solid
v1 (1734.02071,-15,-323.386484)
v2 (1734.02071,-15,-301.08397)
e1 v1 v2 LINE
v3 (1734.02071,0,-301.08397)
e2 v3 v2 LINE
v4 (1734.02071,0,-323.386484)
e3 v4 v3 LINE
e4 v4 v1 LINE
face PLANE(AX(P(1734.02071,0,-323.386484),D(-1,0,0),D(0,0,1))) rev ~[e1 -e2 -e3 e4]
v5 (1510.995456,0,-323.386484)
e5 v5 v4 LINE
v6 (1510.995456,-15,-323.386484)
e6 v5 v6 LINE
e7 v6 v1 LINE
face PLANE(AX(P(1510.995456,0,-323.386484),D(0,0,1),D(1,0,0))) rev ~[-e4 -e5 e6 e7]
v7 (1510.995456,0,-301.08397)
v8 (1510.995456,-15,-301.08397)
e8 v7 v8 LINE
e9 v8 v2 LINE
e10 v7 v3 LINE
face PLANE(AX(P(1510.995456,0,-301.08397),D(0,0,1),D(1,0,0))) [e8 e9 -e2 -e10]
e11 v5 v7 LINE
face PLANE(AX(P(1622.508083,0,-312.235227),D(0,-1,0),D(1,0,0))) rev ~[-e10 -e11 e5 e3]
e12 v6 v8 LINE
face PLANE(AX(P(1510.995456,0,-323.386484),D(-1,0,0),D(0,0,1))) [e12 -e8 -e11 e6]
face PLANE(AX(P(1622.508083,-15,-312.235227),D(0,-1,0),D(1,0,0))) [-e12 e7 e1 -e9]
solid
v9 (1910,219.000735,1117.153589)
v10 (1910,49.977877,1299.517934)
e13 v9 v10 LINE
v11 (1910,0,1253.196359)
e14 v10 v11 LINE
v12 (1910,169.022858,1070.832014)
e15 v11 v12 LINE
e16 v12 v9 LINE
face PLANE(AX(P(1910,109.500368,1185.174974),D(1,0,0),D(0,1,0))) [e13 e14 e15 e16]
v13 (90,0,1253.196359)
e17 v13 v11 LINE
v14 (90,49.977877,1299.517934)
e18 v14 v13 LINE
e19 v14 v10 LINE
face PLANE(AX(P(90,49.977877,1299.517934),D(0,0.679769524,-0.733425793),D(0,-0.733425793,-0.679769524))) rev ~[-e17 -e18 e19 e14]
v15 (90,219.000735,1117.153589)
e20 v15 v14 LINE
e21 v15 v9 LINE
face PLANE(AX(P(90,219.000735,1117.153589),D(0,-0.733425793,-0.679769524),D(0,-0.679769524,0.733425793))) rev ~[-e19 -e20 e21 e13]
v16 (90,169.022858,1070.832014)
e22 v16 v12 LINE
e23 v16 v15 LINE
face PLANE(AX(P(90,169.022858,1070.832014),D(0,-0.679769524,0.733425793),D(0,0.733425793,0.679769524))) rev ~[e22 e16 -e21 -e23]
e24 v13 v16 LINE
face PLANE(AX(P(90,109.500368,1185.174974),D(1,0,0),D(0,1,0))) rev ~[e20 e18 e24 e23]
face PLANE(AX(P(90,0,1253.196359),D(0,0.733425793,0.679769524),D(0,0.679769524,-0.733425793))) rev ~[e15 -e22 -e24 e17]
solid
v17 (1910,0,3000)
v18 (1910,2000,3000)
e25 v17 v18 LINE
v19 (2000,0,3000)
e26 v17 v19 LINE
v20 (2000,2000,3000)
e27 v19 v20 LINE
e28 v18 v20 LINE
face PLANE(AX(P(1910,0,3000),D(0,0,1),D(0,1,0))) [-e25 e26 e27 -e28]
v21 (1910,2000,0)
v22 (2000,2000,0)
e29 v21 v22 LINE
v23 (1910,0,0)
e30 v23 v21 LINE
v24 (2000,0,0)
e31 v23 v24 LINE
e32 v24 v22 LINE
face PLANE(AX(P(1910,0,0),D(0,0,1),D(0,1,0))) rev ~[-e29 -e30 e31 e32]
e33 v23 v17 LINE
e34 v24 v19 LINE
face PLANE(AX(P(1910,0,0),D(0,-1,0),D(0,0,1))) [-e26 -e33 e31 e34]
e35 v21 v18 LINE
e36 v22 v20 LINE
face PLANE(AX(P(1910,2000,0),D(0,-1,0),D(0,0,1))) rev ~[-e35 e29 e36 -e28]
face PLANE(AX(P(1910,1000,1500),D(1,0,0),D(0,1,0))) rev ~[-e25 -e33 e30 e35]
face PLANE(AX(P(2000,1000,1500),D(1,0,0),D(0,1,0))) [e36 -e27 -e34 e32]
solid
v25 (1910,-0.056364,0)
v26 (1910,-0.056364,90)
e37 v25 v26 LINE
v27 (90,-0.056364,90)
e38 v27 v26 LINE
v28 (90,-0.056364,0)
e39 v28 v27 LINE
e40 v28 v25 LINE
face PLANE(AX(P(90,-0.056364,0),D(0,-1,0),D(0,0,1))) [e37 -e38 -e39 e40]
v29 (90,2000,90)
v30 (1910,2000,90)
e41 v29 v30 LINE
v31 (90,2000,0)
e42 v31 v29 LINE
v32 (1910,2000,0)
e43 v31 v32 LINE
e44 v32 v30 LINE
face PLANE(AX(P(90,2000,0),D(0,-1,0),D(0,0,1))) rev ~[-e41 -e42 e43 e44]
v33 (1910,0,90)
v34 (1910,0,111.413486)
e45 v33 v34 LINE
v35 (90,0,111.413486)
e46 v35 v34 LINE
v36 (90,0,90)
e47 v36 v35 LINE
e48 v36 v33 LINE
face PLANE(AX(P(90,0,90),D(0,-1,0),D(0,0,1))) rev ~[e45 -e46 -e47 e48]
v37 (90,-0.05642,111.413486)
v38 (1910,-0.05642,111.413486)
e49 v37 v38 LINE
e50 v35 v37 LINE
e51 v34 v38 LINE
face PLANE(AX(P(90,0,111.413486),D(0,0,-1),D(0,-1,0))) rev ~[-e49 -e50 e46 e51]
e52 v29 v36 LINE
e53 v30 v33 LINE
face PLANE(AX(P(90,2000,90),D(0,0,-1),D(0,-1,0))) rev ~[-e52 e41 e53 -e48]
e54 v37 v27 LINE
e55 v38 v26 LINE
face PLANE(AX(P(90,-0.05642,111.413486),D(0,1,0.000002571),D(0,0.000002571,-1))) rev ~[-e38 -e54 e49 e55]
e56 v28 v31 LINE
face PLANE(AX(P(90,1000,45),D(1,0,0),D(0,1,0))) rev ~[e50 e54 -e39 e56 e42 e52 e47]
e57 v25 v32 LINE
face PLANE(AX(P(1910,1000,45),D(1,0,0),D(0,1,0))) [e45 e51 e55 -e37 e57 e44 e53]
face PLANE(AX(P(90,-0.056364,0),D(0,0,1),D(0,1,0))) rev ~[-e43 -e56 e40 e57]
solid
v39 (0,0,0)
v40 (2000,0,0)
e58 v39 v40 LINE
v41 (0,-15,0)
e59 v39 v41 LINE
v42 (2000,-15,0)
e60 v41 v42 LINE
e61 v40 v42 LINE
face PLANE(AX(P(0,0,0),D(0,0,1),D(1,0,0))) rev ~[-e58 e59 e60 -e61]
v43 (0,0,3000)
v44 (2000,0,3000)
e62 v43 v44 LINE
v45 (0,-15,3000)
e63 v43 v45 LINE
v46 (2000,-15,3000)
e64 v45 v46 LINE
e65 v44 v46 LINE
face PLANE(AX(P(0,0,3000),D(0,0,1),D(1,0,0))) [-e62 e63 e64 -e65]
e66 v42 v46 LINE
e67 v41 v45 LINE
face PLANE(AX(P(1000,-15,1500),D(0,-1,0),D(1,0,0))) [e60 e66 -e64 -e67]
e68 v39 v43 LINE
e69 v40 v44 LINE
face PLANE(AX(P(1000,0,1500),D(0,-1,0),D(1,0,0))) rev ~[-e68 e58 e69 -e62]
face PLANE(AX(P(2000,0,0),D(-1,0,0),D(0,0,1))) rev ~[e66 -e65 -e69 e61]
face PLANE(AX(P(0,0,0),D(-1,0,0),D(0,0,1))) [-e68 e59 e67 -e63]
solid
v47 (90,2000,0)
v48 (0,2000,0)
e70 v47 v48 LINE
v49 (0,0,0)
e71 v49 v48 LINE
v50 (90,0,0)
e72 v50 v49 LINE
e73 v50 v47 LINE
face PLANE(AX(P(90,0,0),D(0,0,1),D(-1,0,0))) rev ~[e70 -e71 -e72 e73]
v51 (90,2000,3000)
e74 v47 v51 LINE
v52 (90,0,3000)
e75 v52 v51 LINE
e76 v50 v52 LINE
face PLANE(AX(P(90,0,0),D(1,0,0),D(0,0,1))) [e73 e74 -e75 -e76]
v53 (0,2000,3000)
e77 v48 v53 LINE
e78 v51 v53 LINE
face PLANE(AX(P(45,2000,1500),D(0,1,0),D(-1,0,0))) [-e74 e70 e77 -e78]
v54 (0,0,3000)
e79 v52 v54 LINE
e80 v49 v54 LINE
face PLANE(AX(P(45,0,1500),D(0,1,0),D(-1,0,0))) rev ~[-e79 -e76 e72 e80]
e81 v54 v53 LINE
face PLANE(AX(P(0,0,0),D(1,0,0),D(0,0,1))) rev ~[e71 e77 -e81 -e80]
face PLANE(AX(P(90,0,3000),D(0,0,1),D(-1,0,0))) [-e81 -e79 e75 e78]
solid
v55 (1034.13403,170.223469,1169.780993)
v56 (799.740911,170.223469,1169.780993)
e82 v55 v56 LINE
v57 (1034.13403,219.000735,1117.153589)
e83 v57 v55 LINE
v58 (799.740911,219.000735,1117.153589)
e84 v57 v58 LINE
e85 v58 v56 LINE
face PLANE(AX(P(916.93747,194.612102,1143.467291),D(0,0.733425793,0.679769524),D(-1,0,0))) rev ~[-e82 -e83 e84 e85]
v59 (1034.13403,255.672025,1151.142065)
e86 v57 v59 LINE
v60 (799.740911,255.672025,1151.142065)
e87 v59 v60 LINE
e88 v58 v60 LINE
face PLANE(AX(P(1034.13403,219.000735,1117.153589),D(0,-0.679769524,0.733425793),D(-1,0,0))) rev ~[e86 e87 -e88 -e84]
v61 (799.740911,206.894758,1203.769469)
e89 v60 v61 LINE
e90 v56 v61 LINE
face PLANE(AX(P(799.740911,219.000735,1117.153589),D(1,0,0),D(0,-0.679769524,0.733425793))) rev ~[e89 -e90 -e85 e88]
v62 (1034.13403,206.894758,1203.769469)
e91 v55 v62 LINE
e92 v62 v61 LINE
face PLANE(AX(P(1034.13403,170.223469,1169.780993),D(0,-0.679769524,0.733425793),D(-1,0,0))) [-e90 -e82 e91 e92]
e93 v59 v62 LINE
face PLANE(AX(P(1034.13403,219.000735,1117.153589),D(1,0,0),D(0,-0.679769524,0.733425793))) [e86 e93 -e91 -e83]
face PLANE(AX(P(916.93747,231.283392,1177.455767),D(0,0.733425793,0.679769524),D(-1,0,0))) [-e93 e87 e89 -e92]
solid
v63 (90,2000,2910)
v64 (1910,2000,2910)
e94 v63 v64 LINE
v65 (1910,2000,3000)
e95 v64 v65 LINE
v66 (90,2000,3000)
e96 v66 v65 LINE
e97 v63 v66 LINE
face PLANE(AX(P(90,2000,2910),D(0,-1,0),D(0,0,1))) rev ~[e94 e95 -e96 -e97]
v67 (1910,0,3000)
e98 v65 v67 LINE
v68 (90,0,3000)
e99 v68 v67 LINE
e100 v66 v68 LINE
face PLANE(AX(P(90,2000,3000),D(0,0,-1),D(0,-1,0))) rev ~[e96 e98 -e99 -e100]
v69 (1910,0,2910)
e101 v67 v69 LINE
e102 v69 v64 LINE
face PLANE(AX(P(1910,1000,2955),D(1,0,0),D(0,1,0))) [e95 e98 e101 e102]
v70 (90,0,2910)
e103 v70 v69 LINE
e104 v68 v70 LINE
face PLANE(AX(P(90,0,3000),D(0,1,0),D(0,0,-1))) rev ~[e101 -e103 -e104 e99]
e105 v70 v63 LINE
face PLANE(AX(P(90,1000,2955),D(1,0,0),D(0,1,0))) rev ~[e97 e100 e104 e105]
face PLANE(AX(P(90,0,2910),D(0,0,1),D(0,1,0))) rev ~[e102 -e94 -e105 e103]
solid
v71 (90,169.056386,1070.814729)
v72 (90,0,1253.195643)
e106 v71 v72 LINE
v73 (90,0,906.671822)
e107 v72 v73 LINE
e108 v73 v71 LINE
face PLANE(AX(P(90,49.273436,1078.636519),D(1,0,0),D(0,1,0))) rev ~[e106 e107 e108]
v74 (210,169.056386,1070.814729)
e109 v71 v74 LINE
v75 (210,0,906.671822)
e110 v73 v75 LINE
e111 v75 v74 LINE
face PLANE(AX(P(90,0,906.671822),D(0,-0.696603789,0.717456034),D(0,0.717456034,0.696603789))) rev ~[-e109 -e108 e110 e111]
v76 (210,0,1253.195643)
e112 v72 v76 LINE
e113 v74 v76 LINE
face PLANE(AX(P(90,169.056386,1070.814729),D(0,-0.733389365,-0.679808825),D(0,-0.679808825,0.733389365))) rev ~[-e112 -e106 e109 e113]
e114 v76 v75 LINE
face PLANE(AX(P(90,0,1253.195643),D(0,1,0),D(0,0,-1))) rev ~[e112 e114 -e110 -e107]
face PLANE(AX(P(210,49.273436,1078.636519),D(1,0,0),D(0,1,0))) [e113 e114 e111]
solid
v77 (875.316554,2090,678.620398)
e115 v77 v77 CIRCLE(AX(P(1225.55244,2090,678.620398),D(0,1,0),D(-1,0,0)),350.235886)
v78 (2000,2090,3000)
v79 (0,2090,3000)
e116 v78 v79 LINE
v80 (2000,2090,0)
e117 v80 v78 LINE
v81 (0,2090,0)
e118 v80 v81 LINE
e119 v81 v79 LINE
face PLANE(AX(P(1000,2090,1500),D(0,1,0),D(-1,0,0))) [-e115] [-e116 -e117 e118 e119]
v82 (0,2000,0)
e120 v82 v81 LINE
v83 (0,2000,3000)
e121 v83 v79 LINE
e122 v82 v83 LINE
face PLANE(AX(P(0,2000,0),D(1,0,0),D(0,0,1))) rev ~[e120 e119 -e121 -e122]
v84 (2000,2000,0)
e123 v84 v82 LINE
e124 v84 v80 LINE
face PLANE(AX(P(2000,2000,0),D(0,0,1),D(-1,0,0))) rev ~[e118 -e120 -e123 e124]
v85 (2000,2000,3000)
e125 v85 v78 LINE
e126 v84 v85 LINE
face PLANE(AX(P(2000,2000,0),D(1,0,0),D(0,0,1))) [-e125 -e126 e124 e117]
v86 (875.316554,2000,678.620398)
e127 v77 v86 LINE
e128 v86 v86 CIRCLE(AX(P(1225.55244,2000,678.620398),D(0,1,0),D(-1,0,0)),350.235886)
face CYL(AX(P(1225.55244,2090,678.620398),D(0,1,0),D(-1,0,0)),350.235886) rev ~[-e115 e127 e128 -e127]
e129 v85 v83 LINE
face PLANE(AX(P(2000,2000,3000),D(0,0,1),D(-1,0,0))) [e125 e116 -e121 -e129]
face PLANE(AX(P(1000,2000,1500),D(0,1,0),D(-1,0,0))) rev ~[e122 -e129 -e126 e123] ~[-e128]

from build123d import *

# Parameters (mm, degrees)
F0_W      = 2000
F0_H      = 3000
F1_DEPTH  = 15
F0_W_2    = 223.0252540781
F0_H_2    = 22.3025142319
F2_W      = 90
F2_H      = 3000
F3_DEPTH  = 2000
F5_DEPTH  = 120
F7_DEPTH  = 1820
F8_W      = 234.393119812
F8_H      = 71.7555948407
F9_DEPTH  = 50
F11_DEPTH = 1820
F12_W     = 2000
F12_H     = 90
F12_W_2   = 0.0563644571
F13_DEPTH = 1820
F14_W     = 2000
F14_H     = 3000
F15_DEPTH = 90
F16_W     = 2000
F16_H     = 3000
F17_DEPTH = 90
F18_R     = 350.2358859711
F19_DEPTH = 90


# Not quite as in the source:
# - ends of sketch curves that miss each other by under 0.0002 mm in the source are joined


with BuildPart() as f1:
    # F0 (on Front) → F1 (new body)
    with BuildSketch(Plane.XZ):
        with Locations((1000, 1500)):
            Rectangle(F0_W, F0_H)
    extrude(amount=F1_DEPTH)


with BuildPart() as f1b:
    # F0 (on Front) → F1, piece 2 (new body)
    with BuildSketch(Plane.XZ):
        with Locations((1622.508082666, -312.2352271864)):
            Rectangle(F0_W_2, F0_H_2)
    extrude(amount=F1_DEPTH)


with BuildPart() as f3:
    # F2 (on face) → F3 (new body)
    with BuildSketch(Plane(origin=(0, 0, 0), x_dir=(-1, 0, 0), z_dir=(0, 1, 0))):
        with Locations((-45, 1500)):
            Rectangle(F2_W, F2_H)
    extrude(amount=F3_DEPTH)


with BuildPart() as f5:
    # F4 (on face) → F5 (new body)
    with BuildSketch(Plane.YZ.offset(90)):
        Polygon((169.0563857555, 1070.8147287369), (0, 1253.195643425), (0, 906.6718220711), align=None)
    extrude(amount=F5_DEPTH)


with BuildPart() as f7:
    # F6 (on face) → F7 (new body)
    with BuildSketch(Plane.YZ.offset(90)):
        Polygon((0, 1253.1963586807), (169.0228581429, 1070.8320140839), (219.0007353757, 1117.1535890194), (49.9778772329, 1299.5179336163), align=None)
    extrude(amount=F7_DEPTH)


with BuildPart() as f9:
    # F8 (on face) → F9 (new body)
    with BuildSketch(Plane(origin=(0, 674.7720834381, 625.4068271396), x_dir=(-1, 0, 0), z_dir=(0, 0.733425793, 0.6797695243))):
        with Locations((-916.9374704361, 706.3570286676)):
            Rectangle(F8_W, F8_H)
    extrude(amount=F9_DEPTH)


with BuildPart() as f11:
    # F10 (on face) → F11 (new body)
    with BuildSketch(Plane.YZ.offset(90)):
        Polygon((2000, 2910), (2000, 3000), (0, 3000), (0, 2910), (434.6059262753, 2910), (667.1281456947, 2910), align=None)
    extrude(amount=F11_DEPTH)


with BuildPart() as f13:
    # F12 (on face) → F13 (new body)
    with BuildSketch(Plane.YZ.offset(90)):
        with Locations((1000, 45)):
            Rectangle(F12_W, F12_H)
        with Locations((-0.0281822286, 45)):
            Rectangle(F12_W_2, F12_H)
        Polygon((-0.0563644571, 90), (0, 90), (0, 111.4134863019), (-0.0564195216, 111.4134863019), align=None)
    extrude(amount=F13_DEPTH)


with BuildPart() as f15:
    # F14 (on face) → F15 (new body)
    with BuildSketch(Plane.YZ.offset(1910)):
        with Locations((1000, 1500)):
            Rectangle(F14_W, F14_H)
    extrude(amount=F15_DEPTH)


with BuildPart() as f17:
    # F16 (on face) → F17 (new body)
    with BuildSketch(Plane(origin=(0, 2000, 0), x_dir=(-1, 0, 0), z_dir=(0, 1, 0))):
        with Locations((-1000, 1500)):
            Rectangle(F16_W, F16_H)
    extrude(amount=F17_DEPTH)

    # F18 (on face) → F19 (cut)
    with BuildSketch(Plane(origin=(0, 2090, 0), x_dir=(-1, 0, 0), z_dir=(0, 1, 0))):
        with Locations((-1225.5524396896, 678.6203980446)):
            Circle(F18_R)
    extrude(amount=-F19_DEPTH, mode=Mode.SUBTRACT)


solid = Compound([f1.part, f1b.part, f3.part, f5.part, f7.part, f9.part, f11.part, f13.part, f15.part, f17.part])
